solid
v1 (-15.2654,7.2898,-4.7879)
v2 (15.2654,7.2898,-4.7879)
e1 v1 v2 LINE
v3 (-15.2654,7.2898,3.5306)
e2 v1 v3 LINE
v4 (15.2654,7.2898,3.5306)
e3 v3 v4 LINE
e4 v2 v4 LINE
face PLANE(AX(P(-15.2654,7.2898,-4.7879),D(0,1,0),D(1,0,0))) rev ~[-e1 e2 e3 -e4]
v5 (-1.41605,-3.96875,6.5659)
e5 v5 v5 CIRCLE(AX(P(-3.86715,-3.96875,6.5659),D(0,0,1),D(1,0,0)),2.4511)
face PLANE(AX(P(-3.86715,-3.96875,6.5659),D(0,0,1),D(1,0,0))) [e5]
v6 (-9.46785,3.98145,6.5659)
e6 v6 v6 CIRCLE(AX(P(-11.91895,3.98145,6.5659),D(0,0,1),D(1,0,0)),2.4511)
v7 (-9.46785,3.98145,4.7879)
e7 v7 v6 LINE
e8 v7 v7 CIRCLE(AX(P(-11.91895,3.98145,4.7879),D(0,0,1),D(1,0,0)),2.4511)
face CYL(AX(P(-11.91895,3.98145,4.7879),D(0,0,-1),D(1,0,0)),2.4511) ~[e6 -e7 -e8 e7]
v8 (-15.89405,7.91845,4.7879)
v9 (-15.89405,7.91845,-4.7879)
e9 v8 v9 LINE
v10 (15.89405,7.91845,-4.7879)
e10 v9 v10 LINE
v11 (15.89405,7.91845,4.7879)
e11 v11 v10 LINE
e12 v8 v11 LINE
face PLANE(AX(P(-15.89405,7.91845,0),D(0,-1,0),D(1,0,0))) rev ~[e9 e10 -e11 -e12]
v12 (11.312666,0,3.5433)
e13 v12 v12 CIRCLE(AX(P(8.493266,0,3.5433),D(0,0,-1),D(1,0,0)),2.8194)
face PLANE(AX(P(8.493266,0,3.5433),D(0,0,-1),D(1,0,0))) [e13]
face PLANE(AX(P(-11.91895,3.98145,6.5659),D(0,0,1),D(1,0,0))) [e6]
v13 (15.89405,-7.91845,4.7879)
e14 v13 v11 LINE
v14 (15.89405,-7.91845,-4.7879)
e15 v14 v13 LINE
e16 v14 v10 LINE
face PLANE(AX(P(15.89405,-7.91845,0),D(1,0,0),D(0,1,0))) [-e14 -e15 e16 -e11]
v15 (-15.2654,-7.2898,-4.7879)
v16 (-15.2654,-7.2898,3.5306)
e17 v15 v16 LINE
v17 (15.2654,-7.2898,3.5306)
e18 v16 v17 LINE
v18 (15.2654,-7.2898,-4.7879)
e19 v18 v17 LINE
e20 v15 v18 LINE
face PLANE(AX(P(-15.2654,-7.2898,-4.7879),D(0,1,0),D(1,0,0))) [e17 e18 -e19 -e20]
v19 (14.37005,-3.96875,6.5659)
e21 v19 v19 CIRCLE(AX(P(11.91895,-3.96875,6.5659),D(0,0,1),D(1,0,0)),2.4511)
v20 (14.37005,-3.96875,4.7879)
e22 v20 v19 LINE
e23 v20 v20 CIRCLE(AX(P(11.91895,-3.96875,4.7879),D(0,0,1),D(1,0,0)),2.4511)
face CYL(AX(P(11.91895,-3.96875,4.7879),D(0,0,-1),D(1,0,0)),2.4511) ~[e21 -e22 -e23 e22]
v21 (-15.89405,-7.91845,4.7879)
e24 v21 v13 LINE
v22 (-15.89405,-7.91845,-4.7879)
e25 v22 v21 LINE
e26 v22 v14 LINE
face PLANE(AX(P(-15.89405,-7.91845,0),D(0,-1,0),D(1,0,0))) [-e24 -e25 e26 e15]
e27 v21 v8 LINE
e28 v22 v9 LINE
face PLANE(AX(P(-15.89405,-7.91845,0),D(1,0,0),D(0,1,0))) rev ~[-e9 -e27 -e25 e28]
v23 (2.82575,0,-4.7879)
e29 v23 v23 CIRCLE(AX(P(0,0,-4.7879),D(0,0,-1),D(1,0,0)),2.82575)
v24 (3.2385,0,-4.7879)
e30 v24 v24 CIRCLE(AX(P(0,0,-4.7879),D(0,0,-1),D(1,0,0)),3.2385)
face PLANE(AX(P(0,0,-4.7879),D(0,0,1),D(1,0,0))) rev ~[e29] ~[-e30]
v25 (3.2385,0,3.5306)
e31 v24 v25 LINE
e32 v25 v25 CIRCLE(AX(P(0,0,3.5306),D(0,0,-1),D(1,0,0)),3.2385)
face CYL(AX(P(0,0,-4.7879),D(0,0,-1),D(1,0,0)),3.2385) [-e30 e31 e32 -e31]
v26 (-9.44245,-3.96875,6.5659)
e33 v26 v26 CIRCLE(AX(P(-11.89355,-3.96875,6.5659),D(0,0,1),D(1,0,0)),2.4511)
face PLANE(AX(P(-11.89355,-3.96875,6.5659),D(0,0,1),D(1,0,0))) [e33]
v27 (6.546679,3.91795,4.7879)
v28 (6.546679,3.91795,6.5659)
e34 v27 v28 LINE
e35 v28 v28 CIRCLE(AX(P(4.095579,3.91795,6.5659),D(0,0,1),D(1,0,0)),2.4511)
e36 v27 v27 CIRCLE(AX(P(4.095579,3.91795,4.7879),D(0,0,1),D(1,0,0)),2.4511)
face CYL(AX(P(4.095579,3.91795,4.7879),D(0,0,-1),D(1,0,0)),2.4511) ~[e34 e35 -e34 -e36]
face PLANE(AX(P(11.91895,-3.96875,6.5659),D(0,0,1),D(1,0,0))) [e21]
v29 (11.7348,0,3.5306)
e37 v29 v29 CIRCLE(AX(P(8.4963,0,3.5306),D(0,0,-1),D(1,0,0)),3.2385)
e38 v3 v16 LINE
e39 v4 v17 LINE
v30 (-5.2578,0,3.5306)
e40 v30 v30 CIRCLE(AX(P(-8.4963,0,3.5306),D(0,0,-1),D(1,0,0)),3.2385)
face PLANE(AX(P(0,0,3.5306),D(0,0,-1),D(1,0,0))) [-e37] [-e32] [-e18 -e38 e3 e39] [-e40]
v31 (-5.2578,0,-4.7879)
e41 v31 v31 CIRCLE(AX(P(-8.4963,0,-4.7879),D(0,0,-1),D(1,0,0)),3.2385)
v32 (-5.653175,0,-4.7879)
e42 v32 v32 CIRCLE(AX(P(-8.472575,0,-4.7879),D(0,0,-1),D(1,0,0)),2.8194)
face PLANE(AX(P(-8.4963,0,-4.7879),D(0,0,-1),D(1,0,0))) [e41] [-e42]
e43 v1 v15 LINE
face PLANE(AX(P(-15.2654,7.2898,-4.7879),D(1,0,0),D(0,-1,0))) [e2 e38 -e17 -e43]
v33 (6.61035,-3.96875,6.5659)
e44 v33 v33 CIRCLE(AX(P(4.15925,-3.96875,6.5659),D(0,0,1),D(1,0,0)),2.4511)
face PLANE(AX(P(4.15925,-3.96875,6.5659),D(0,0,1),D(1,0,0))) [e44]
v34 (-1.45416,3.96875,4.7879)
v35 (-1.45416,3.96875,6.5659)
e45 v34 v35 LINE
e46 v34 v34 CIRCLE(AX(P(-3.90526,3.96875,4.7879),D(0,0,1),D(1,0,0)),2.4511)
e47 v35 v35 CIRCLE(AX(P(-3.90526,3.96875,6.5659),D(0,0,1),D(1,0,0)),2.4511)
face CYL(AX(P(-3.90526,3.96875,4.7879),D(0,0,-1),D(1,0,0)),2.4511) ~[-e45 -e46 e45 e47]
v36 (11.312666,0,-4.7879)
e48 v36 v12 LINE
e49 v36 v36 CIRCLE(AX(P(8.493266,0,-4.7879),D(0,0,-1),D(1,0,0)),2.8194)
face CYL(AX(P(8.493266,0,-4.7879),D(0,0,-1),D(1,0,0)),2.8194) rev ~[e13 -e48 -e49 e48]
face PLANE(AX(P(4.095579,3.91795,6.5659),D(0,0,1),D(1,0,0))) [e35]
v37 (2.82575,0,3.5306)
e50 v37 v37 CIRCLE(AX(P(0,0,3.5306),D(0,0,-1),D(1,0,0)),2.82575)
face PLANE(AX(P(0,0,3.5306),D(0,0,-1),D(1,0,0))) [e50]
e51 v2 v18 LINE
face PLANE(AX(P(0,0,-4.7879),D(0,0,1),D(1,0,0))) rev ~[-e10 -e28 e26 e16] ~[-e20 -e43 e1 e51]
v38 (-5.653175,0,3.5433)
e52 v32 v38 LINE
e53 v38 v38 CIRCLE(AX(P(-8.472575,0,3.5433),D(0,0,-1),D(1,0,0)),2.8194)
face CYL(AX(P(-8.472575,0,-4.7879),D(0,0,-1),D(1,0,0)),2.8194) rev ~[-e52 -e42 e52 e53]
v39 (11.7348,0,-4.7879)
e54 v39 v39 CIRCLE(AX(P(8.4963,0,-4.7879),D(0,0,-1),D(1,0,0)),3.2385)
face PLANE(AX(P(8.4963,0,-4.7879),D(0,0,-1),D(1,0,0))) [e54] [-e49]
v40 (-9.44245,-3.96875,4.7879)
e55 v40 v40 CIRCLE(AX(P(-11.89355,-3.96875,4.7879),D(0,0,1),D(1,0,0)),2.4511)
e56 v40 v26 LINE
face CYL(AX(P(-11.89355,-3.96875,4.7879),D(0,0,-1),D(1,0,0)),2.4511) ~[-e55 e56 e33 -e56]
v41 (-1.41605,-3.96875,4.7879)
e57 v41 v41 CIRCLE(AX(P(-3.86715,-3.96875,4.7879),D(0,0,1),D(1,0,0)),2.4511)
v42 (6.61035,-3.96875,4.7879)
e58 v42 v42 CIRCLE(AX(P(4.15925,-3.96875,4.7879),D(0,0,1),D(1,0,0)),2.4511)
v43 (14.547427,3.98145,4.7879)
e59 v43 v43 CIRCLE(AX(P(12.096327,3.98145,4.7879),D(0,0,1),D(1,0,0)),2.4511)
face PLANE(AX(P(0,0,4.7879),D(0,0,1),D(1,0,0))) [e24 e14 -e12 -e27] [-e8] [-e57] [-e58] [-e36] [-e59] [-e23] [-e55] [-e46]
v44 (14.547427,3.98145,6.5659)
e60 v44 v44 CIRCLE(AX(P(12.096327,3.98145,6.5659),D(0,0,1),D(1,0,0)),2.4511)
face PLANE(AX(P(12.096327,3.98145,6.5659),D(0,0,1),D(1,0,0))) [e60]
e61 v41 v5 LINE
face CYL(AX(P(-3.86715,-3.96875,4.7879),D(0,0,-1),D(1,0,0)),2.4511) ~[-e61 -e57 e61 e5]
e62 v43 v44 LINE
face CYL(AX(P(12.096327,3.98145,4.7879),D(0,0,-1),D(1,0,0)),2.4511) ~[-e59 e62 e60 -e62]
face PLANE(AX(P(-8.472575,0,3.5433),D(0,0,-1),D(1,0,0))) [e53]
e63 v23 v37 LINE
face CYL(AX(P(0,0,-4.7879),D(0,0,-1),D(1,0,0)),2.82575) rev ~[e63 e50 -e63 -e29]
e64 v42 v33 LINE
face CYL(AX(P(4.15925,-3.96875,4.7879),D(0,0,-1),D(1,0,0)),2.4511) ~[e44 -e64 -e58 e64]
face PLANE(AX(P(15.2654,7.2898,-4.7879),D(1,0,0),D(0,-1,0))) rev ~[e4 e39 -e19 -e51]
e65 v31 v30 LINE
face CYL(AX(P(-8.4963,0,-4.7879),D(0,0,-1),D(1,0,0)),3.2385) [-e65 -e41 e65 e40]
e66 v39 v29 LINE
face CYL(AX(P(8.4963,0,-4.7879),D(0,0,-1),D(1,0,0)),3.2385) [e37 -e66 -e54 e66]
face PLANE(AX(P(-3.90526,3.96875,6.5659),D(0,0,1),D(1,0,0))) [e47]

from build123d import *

# Parameters (mm, degrees)
F0_W      = 31.7881
F0_H      = 15.8369
F1_DEPTH  = 4.7879
F2_R      = 2.4511
F3_DEPTH  = 1.778
F4_R      = 2.4511
F5_DEPTH  = 1.778
F6_R      = 2.4511
F7_DEPTH  = 1.778
F8_R      = 2.4511
F9_DEPTH  = 1.778
F10_R     = 2.4511
F11_DEPTH = 1.778
F12_R     = 2.4511
F13_DEPTH = 1.778
F14_R     = 2.4511
F15_DEPTH = 1.778
F16_R     = 2.4511
F17_DEPTH = 1.778
F20_R     = 2.82575
F22_DEPTH = 8.3185
F20_W     = 30.5308
F20_H     = 14.5796
F20_R_2   = 3.2385
F23_DEPTH = 8.3185
F24_R     = 3.2385
F28_DEPTH = 8.3312
F25_R     = 3.2385
F29_DEPTH = 8.3312
F26_R     = 2.8194
F30_DEPTH = 8.3312
F27_R     = 2.8194
F31_DEPTH = 8.3312


# Not quite as in the source:
# - the program builds the solid bodies; features that only make, move or delete a surface that nothing else refers to are left out


with BuildPart() as f1:
    # F0 (on Top) → F1 (new body, symmetric)
    with BuildSketch(Plane.XY):
        Rectangle(F0_W, F0_H)
    extrude(amount=F1_DEPTH, both=True)

    # F2 (on face) → F3 (join)
    with BuildSketch(Plane.XY.offset(4.7879)):
        with Locations((-11.91895, 3.98145)):
            Circle(F2_R)
    extrude(amount=F3_DEPTH)

    # F4 (on face) → F5 (join)
    with BuildSketch(Plane.XY.offset(4.7879)):
        with Locations((-3.9052600634, 3.96875)):
            Circle(F4_R)
    extrude(amount=F5_DEPTH)

    # F6 (on face) → F7 (join)
    with BuildSketch(Plane.XY.offset(4.7879)):
        with Locations((4.0955786651, 3.91795)):
            Circle(F6_R)
    extrude(amount=F7_DEPTH)

    # F8 (on face) → F9 (join)
    with BuildSketch(Plane.XY.offset(4.7879)):
        with Locations((12.096326677, 3.98145)):
            Circle(F8_R)
    extrude(amount=F9_DEPTH)

    # F10 (on face) → F11 (join)
    with BuildSketch(Plane.XY.offset(4.7879)):
        with Locations((-11.89355, -3.96875)):
            Circle(F10_R)
    extrude(amount=F11_DEPTH)

    # F12 (on face) → F13 (join)
    with BuildSketch(Plane.XY.offset(4.7879)):
        with Locations((-3.86715, -3.96875)):
            Circle(F12_R)
    extrude(amount=F13_DEPTH)

    # F14 (on face) → F15 (join)
    with BuildSketch(Plane.XY.offset(4.7879)):
        with Locations((4.15925, -3.96875)):
            Circle(F14_R)
    extrude(amount=F15_DEPTH)

    # F16 (on face) → F17 (join)
    with BuildSketch(Plane.XY.offset(4.7879)):
        with Locations((11.91895, -3.96875)):
            Circle(F16_R)
    extrude(amount=F17_DEPTH)

    # F20 (on face) → F22 (cut)
    with BuildSketch(Plane(origin=(0, 0, -4.7879), x_dir=(1, 0, 0), z_dir=(0, 0, -1))):
        Circle(F20_R)
    extrude(amount=-F22_DEPTH, mode=Mode.SUBTRACT)

    # F20 (on face) → F23 (cut)
    with BuildSketch(Plane(origin=(0, 0, -4.7879), x_dir=(1, 0, 0), z_dir=(0, 0, -1))):
        Rectangle(F20_W, F20_H)
        Circle(F20_R_2, mode=Mode.SUBTRACT)
    extrude(amount=-F23_DEPTH, mode=Mode.SUBTRACT)

    # F24 (on face) → F28 (join)
    with BuildSketch(Plane(origin=(0, 0, -4.7879), x_dir=(1, 0, 0), z_dir=(0, 0, -1))):
        with Locations((-8.4963, 0)):
            Circle(F24_R)
    extrude(amount=-F28_DEPTH)

    # F25 (on face) → F29 (join)
    with BuildSketch(Plane(origin=(0, 0, -4.7879), x_dir=(1, 0, 0), z_dir=(0, 0, -1))):
        with Locations((8.4963, 0)):
            Circle(F25_R)
    extrude(amount=-F29_DEPTH)

    # F26 (on face) → F30 (cut)
    with BuildSketch(Plane(origin=(0, 0, -4.7879), x_dir=(1, 0, 0), z_dir=(0, 0, -1))):
        with Locations((-8.472575021, 0)):
            Circle(F26_R)
    extrude(amount=-F30_DEPTH, mode=Mode.SUBTRACT)

    # F27 (on face) → F31 (cut)
    with BuildSketch(Plane(origin=(0, 0, -4.7879), x_dir=(1, 0, 0), z_dir=(0, 0, -1))):
        with Locations((8.4932660684, 0)):
            Circle(F27_R)
    extrude(amount=-F31_DEPTH, mode=Mode.SUBTRACT)


solid = f1.part
